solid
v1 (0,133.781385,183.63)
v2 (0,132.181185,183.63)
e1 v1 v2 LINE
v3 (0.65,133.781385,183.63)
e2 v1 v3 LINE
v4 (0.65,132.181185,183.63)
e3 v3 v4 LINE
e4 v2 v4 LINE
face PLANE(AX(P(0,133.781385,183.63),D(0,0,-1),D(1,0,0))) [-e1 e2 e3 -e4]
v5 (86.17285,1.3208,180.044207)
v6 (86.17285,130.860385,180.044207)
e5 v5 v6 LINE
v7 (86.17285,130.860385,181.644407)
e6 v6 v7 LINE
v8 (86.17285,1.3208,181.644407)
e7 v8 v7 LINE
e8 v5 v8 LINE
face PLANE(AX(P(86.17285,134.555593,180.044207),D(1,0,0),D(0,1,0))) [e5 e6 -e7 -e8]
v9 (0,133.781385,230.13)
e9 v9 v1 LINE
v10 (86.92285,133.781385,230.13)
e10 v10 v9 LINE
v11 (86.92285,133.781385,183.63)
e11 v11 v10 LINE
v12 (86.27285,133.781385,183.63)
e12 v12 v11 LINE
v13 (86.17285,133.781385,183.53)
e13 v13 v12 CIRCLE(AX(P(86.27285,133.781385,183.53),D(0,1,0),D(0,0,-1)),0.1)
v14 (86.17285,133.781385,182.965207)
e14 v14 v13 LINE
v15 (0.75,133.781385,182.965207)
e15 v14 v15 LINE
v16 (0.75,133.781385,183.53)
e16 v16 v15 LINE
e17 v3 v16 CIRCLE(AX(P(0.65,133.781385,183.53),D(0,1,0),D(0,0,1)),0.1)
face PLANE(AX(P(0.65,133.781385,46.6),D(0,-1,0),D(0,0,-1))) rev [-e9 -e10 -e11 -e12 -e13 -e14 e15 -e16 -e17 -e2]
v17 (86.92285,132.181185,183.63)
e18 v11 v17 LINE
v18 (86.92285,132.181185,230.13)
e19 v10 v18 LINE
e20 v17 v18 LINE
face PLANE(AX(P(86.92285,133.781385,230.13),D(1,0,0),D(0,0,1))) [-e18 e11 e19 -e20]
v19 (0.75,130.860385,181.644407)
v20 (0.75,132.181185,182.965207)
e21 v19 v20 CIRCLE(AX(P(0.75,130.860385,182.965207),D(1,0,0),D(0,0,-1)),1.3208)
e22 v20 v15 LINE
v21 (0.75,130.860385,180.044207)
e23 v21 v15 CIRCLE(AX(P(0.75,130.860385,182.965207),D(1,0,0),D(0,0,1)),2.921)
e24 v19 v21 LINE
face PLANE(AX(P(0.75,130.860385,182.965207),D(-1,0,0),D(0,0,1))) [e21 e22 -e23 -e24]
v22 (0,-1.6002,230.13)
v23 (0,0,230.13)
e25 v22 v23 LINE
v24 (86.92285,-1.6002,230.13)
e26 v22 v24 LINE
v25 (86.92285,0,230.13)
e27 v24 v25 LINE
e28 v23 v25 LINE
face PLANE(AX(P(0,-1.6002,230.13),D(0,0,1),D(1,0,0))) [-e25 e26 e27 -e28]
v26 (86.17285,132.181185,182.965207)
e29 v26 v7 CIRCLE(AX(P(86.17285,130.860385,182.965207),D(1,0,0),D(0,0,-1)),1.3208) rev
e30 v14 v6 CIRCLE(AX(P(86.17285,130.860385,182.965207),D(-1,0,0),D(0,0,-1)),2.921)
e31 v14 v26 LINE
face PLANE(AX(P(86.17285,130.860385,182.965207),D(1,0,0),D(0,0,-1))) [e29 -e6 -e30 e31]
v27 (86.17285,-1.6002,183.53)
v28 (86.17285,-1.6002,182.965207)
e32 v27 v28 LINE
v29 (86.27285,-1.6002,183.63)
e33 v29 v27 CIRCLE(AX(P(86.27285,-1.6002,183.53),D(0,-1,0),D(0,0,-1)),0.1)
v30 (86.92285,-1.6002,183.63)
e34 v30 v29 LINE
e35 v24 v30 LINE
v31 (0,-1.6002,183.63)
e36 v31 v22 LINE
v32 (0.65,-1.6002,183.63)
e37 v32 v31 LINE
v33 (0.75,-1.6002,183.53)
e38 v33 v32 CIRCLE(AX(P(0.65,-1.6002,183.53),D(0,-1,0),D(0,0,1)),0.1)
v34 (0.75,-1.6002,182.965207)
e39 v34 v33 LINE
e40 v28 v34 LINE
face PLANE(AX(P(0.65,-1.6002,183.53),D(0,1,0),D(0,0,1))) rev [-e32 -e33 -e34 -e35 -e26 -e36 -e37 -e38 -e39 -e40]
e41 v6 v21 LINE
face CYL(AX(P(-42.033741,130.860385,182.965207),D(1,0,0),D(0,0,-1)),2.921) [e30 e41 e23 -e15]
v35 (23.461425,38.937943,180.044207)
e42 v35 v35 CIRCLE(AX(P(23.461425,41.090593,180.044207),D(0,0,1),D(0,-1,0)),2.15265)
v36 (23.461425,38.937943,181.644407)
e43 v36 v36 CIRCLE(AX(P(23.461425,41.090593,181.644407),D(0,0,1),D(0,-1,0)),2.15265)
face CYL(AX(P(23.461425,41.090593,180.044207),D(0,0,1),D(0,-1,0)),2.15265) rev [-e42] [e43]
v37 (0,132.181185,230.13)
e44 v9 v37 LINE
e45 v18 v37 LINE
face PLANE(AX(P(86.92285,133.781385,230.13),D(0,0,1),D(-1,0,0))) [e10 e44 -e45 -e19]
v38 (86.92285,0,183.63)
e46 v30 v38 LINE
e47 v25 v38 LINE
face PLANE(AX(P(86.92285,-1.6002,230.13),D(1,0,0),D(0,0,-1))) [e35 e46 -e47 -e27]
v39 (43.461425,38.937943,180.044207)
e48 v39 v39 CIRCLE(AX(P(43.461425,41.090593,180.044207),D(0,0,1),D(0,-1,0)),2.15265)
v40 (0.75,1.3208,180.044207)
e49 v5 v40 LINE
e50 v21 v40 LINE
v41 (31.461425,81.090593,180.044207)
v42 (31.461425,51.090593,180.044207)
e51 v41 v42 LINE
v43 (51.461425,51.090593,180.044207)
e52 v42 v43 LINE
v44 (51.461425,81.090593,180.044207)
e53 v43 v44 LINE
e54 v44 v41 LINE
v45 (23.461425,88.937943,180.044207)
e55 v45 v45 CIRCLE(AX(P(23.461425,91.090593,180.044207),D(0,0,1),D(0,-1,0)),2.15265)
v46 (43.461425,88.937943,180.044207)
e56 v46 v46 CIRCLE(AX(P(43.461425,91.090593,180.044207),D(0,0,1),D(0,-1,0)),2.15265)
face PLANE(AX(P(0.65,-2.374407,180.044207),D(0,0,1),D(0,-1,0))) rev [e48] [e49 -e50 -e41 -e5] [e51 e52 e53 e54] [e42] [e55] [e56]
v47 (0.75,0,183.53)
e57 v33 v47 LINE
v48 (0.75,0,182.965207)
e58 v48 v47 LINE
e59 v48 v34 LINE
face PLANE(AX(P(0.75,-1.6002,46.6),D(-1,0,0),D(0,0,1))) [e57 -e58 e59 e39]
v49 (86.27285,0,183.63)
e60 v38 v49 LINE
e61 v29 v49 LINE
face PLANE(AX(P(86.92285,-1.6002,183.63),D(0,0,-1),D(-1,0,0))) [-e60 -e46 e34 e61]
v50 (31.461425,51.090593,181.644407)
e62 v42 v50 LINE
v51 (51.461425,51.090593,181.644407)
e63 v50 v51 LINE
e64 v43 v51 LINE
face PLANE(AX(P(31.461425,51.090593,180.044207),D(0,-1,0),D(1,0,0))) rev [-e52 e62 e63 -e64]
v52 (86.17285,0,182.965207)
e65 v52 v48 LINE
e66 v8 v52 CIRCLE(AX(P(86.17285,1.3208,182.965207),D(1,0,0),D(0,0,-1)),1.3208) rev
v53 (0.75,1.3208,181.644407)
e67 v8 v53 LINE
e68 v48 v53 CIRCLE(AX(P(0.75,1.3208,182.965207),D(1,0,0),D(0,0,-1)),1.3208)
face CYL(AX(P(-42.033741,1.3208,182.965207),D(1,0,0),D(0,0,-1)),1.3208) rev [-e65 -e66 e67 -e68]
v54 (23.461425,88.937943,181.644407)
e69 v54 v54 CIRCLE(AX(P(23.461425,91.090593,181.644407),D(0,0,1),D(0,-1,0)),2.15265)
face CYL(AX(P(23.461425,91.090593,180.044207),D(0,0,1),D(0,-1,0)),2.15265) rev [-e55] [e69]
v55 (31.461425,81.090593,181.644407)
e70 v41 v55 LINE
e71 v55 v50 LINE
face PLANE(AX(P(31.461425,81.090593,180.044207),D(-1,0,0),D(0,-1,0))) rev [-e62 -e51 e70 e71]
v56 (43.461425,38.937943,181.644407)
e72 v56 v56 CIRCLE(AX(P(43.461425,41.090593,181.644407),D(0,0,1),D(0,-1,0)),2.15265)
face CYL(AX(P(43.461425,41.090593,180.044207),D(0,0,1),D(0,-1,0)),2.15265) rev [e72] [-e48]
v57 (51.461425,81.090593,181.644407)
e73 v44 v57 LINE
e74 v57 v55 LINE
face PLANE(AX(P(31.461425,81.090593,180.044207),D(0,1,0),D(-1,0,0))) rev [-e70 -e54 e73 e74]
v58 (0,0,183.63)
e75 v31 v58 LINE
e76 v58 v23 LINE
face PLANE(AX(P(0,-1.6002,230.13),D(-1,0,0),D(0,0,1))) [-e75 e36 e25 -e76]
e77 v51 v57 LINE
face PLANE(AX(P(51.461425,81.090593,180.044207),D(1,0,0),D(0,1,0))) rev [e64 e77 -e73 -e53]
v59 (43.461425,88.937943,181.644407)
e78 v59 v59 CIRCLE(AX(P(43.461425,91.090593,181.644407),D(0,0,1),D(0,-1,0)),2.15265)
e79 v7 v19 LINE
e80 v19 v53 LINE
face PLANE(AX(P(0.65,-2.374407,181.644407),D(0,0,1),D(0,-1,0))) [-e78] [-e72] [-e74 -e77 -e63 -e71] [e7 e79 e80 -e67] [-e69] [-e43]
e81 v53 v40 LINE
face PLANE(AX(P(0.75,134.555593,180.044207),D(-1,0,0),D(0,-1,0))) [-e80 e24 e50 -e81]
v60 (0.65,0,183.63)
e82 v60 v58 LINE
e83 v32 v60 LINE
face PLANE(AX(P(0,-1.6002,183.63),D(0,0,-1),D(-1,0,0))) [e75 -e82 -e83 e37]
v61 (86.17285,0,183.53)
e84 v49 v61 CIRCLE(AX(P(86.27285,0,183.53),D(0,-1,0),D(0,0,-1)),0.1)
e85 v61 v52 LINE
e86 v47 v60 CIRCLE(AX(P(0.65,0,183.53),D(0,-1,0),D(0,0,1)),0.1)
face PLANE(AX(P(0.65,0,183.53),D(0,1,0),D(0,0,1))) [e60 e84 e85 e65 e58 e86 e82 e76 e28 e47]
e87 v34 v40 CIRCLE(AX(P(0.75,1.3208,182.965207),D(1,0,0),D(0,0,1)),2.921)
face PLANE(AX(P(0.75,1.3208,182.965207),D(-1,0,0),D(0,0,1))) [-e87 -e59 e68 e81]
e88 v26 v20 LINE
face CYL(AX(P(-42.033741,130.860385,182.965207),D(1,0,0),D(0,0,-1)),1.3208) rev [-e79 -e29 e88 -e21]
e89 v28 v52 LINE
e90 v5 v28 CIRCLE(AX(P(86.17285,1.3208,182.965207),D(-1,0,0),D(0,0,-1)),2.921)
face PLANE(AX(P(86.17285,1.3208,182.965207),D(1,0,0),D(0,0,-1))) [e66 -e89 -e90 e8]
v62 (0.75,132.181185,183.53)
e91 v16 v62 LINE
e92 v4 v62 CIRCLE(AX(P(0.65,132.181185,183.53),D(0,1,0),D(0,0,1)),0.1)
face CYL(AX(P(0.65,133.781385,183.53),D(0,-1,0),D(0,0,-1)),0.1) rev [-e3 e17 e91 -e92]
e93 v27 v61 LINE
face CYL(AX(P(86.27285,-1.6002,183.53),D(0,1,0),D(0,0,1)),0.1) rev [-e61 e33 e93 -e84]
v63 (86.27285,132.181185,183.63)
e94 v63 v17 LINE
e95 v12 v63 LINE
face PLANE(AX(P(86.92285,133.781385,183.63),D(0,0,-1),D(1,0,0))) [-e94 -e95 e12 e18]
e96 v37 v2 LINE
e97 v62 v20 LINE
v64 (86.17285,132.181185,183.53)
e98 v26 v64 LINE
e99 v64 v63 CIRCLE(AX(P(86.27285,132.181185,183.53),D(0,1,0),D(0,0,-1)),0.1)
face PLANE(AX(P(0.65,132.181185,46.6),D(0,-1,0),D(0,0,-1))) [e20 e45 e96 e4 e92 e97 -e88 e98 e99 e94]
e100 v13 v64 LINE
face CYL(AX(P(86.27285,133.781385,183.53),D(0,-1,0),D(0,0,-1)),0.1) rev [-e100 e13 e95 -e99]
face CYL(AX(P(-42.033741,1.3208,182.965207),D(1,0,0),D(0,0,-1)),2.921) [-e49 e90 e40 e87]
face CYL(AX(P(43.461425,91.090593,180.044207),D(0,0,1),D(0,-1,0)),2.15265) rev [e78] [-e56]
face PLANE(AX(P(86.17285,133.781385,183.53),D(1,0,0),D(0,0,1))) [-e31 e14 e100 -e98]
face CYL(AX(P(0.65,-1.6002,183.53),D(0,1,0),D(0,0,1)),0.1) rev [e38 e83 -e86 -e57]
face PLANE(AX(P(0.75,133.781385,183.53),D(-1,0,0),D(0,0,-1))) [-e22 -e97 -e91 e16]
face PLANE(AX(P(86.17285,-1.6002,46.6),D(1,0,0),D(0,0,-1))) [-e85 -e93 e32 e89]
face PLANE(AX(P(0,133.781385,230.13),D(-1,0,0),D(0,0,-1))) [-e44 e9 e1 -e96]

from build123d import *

# Parameters (mm, degrees)
SKETCH1_R                    = 2.15265
SKETCH1_W                    = 20
SKETCH1_H                    = 30
BASE_FLANGE1_DEPTH           = 1.6002
SKETCHED_BEND1_OUTLINE_W     = 86.92285
SKETCHED_BEND1_OUTLINE_H     = 1.6002
SKETCHED_BEND1_DEPTH         = 180.344310973
SKETCHED_START               = 183.63
SKETCHED_BEND1_2_OUTLINE_W   = 86.92285
SKETCHED_BEND1_2_OUTLINE_H   = 1.6002
SKETCHED_BEND1_2_DEPTH       = 46.5
SKETCHED_START_2             = 181.496703893
SKETCHED_BEND1_3_OUTLINE_W   = 85.42285
SKETCHED_BEND1_3_OUTLINE_H   = 132.181185133
SKETCHED_BEND1_3_OUTLINE_R   = 2.15265
SKETCHED_BEND1_3_OUTLINE_W_2 = 20
SKETCHED_BEND1_3_OUTLINE_H_2 = 30
SKETCHED_BEND1_3_DEPTH       = 0.14770354
SKETCHED_START_3             = 182.965207433
SKETCHED_BEND1_4_OUTLINE_W   = 85.42285
SKETCHED_BEND1_4_OUTLINE_H   = 1.6002
SKETCHED_BEND1_4_DEPTH       = 0.664792567
SKETCHED_START_4             = 180.044207433
SKETCHED_BEND1_5_OUTLINE_W   = 85.42285
SKETCHED_BEND1_5_OUTLINE_H   = 132.181185133
SKETCHED_BEND1_5_OUTLINE_R   = 2.15265
SKETCHED_BEND1_5_OUTLINE_W_2 = 20
SKETCHED_BEND1_5_OUTLINE_H_2 = 30
SKETCHED_BEND1_5_DEPTH       = 2.921
SKETCHED_START_5             = 0.75
SKETCHED_BEND1_6_DEPTH       = 85.42285
SKETCHED_START_6             = 132.181185133
SKETCHED_BEND1_7_DEPTH       = 1.6002
SKETCHED_BEND1_8_DEPTH       = 85.42285


with BuildPart() as part:
    # Base-Flange1: sheet metal written as solids
    # Sketch1 → Base-Flange1 (new body)
    with BuildSketch(Plane(origin=(0, 0, 0), x_dir=(1, 0, 0), z_dir=(0, 1, 0))):
        with BuildLine():
            Line((0.75, -46.6), (0.75, -183.53))
            ThreePointArc((0.75, -183.53), (0.720710678, -183.600710678), (0.65, -183.63))
            Line((0.65, -183.63), (0, -183.63))
            Line((0, -183.63), (0, -230.13))
            Line((0, -230.13), (86.92285, -230.13))
            Line((86.92285, -230.13), (86.92285, -183.63))
            Line((86.92285, -183.63), (86.27285, -183.63))
            ThreePointArc((86.27285, -183.63), (86.202139322, -183.600710678), (86.17285, -183.53))
            Line((86.17285, -183.53), (86.17285, -46.6))
            ThreePointArc((86.17285, -46.6), (86.202139322, -46.529289322), (86.27285, -46.5))
            Line((86.27285, -46.5), (86.92285, -46.5))
            Line((86.92285, -46.5), (86.92285, 0))
            Line((86.92285, 0), (0, 0))
            Line((0, 0), (0, -46.5))
            Line((0, -46.5), (0.65, -46.5))
            ThreePointArc((0.65, -46.5), (0.720710678, -46.529289322), (0.75, -46.6))
        make_face()
        with Locations(Location((43.461425, -90.065, 0), (0, 0, 270))):
            Circle(SKETCH1_R, mode=Mode.SUBTRACT)
        with Locations(Location((43.461425, -140.065, 0), (0, 0, 270))):
            Circle(SKETCH1_R, mode=Mode.SUBTRACT)
        with Locations(Location((23.461425, -90.065, 0), (0, 0, 270))):
            Circle(SKETCH1_R, mode=Mode.SUBTRACT)
        with Locations(Location((23.461425, -140.065, 0), (0, 0, 270))):
            Circle(SKETCH1_R, mode=Mode.SUBTRACT)
        with Locations((41.461425, -115.065)):
            Rectangle(SKETCH1_W, SKETCH1_H, mode=Mode.SUBTRACT)
    extrude(amount=-BASE_FLANGE1_DEPTH)

    # Sketched Bend1: read off the stored shape, not the designer's step
    # Sketched Bend1 outline → Sketched Bend1 (cut)
    with BuildSketch(Plane.XY):
        with Locations((43.461425, -0.8001)):
            Rectangle(SKETCHED_BEND1_OUTLINE_W, SKETCHED_BEND1_OUTLINE_H)
    extrude(amount=SKETCHED_BEND1_DEPTH, mode=Mode.SUBTRACT)

    # Sketched Bend1 3 outline → Sketched Bend1 3 (add)
    with BuildSketch(Plane.XY.offset(SKETCHED_START_2)):
        with Locations((43.461425, 66.090592567)):
            Rectangle(SKETCHED_BEND1_3_OUTLINE_W, SKETCHED_BEND1_3_OUTLINE_H)
        with Locations((23.461425, 41.090592567)):
            Circle(SKETCHED_BEND1_3_OUTLINE_R, mode=Mode.SUBTRACT)
        with Locations((43.461425, 41.090592567)):
            Circle(SKETCHED_BEND1_3_OUTLINE_R, mode=Mode.SUBTRACT)
        with Locations((41.461425, 66.090592567)):
            Rectangle(SKETCHED_BEND1_3_OUTLINE_W_2, SKETCHED_BEND1_3_OUTLINE_H_2, mode=Mode.SUBTRACT)
        with Locations((23.461425, 91.090592567)):
            Circle(SKETCHED_BEND1_3_OUTLINE_R, mode=Mode.SUBTRACT)
        with Locations((43.461425, 91.090592567)):
            Circle(SKETCHED_BEND1_3_OUTLINE_R, mode=Mode.SUBTRACT)
    extrude(amount=SKETCHED_BEND1_3_DEPTH)



with BuildPart() as body_2:
    # Sketched Bend1 2 outline → Sketched Bend1 2 (new body)
    with BuildSketch(Plane.XY.offset(SKETCHED_START)):
        with Locations((43.461425, 132.981285133)):
            Rectangle(SKETCHED_BEND1_2_OUTLINE_W, SKETCHED_BEND1_2_OUTLINE_H)
    extrude(amount=SKETCHED_BEND1_2_DEPTH)

    # Sketched Bend1 4 outline → Sketched Bend1 4 (add)
    with BuildSketch(Plane.XY.offset(SKETCHED_START_3)):
        with Locations((43.461425, 132.981285133)):
            Rectangle(SKETCHED_BEND1_4_OUTLINE_W, SKETCHED_BEND1_4_OUTLINE_H)
    extrude(amount=SKETCHED_BEND1_4_DEPTH)


with BuildPart() as part_1:
    add(part.part)

    add(body_2.part)  # Sketched Bend1 5 merges body 2
    # Sketched Bend1 5 outline → Sketched Bend1 5 (add)
    with BuildSketch(Plane.XY.offset(SKETCHED_START_4)):
        with Locations((43.461425, 66.090592567)):
            Rectangle(SKETCHED_BEND1_5_OUTLINE_W, SKETCHED_BEND1_5_OUTLINE_H)
        with Locations((23.461425, 41.090592567)):
            Circle(SKETCHED_BEND1_5_OUTLINE_R, mode=Mode.SUBTRACT)
        with Locations((43.461425, 41.090592567)):
            Circle(SKETCHED_BEND1_5_OUTLINE_R, mode=Mode.SUBTRACT)
        with Locations((41.461425, 66.090592567)):
            Rectangle(SKETCHED_BEND1_5_OUTLINE_W_2, SKETCHED_BEND1_5_OUTLINE_H_2, mode=Mode.SUBTRACT)
        with Locations((23.461425, 91.090592567)):
            Circle(SKETCHED_BEND1_5_OUTLINE_R, mode=Mode.SUBTRACT)
        with Locations((43.461425, 91.090592567)):
            Circle(SKETCHED_BEND1_5_OUTLINE_R, mode=Mode.SUBTRACT)
    extrude(amount=SKETCHED_BEND1_5_DEPTH)

    # Sketched Bend1 6 outline → Sketched Bend1 6 (add)
    with BuildSketch(Plane.YZ.offset(SKETCHED_START_5)):
        with BuildLine():
            Line((133.781385133, 182.965207433), (132.181185133, 182.965207433))
            Line((132.181185133, 182.965207433), (132.181185133, 180.359880513))
            ThreePointArc((132.181185133, 180.359880513), (133.349390737, 181.436452352), (133.781385133, 182.965207433))
        make_face()
    extrude(amount=SKETCHED_BEND1_6_DEPTH)

    # Sketched Bend1 7 outline → Sketched Bend1 7 (add)
    with BuildSketch(Plane(origin=(0, 0, 0), x_dir=(1, 0, 0), z_dir=(0, 1, 0)).offset(SKETCHED_START_6)):
        with BuildLine():
            Line((0.75, -183.63), (0.75, -183.53))
            ThreePointArc((0.75, -183.53), (0.720710678, -183.600710678), (0.65, -183.63))
            Line((0.65, -183.63), (0.75, -183.63))
        make_face()
        with BuildLine():
            ThreePointArc((86.27285, -183.63), (86.202139322, -183.600710678), (86.17285, -183.53))
            Line((86.17285, -183.53), (86.17285, -183.63))
            Line((86.17285, -183.63), (86.27285, -183.63))
        make_face()
    extrude(amount=SKETCHED_BEND1_7_DEPTH)

    # Sketched Bend1 8 outline → Sketched Bend1 8 (cut)
    with BuildSketch(Plane.YZ.offset(SKETCHED_START_5)):
        with BuildLine():
            ThreePointArc((130.860385133, 181.644407433), (131.79433177, 182.031260796), (132.181185133, 182.965207433))
            Line((132.181185133, 182.965207433), (0, 182.965207433))
            ThreePointArc((0, 182.965207433), (0.386853363, 182.031260796), (1.3208, 181.644407433))
            Line((1.3208, 181.644407433), (130.860385133, 181.644407433))
        make_face()
        with BuildLine():
            Line((132.181185133, 180.044207433), (132.181185133, 180.359880513))
            ThreePointArc((132.181185133, 180.359880513), (131.539384789, 180.124221607), (130.860385133, 180.044207433))
            Line((130.860385133, 180.044207433), (132.181185133, 180.044207433))
        make_face()
        with BuildLine():
            Line((0, 180.04420738), (1.3208, 180.044207433))
            ThreePointArc((1.3208, 180.044207433), (-0.744658907, 180.899748526), (-1.6002, 182.965207433))
            Line((-1.6002, 182.965207433), (-1.600200001, 185))
            Line((-1.600200001, 185), (-3, 185))
            Line((-3, 185), (-3, 180.344310973))
            Line((-3, 180.344310973), (0, 180.344310973))
            Line((0, 180.344310973), (0, 180.04420738))
        make_face()
    extrude(amount=SKETCHED_BEND1_8_DEPTH, mode=Mode.SUBTRACT)


solid = part_1.part
